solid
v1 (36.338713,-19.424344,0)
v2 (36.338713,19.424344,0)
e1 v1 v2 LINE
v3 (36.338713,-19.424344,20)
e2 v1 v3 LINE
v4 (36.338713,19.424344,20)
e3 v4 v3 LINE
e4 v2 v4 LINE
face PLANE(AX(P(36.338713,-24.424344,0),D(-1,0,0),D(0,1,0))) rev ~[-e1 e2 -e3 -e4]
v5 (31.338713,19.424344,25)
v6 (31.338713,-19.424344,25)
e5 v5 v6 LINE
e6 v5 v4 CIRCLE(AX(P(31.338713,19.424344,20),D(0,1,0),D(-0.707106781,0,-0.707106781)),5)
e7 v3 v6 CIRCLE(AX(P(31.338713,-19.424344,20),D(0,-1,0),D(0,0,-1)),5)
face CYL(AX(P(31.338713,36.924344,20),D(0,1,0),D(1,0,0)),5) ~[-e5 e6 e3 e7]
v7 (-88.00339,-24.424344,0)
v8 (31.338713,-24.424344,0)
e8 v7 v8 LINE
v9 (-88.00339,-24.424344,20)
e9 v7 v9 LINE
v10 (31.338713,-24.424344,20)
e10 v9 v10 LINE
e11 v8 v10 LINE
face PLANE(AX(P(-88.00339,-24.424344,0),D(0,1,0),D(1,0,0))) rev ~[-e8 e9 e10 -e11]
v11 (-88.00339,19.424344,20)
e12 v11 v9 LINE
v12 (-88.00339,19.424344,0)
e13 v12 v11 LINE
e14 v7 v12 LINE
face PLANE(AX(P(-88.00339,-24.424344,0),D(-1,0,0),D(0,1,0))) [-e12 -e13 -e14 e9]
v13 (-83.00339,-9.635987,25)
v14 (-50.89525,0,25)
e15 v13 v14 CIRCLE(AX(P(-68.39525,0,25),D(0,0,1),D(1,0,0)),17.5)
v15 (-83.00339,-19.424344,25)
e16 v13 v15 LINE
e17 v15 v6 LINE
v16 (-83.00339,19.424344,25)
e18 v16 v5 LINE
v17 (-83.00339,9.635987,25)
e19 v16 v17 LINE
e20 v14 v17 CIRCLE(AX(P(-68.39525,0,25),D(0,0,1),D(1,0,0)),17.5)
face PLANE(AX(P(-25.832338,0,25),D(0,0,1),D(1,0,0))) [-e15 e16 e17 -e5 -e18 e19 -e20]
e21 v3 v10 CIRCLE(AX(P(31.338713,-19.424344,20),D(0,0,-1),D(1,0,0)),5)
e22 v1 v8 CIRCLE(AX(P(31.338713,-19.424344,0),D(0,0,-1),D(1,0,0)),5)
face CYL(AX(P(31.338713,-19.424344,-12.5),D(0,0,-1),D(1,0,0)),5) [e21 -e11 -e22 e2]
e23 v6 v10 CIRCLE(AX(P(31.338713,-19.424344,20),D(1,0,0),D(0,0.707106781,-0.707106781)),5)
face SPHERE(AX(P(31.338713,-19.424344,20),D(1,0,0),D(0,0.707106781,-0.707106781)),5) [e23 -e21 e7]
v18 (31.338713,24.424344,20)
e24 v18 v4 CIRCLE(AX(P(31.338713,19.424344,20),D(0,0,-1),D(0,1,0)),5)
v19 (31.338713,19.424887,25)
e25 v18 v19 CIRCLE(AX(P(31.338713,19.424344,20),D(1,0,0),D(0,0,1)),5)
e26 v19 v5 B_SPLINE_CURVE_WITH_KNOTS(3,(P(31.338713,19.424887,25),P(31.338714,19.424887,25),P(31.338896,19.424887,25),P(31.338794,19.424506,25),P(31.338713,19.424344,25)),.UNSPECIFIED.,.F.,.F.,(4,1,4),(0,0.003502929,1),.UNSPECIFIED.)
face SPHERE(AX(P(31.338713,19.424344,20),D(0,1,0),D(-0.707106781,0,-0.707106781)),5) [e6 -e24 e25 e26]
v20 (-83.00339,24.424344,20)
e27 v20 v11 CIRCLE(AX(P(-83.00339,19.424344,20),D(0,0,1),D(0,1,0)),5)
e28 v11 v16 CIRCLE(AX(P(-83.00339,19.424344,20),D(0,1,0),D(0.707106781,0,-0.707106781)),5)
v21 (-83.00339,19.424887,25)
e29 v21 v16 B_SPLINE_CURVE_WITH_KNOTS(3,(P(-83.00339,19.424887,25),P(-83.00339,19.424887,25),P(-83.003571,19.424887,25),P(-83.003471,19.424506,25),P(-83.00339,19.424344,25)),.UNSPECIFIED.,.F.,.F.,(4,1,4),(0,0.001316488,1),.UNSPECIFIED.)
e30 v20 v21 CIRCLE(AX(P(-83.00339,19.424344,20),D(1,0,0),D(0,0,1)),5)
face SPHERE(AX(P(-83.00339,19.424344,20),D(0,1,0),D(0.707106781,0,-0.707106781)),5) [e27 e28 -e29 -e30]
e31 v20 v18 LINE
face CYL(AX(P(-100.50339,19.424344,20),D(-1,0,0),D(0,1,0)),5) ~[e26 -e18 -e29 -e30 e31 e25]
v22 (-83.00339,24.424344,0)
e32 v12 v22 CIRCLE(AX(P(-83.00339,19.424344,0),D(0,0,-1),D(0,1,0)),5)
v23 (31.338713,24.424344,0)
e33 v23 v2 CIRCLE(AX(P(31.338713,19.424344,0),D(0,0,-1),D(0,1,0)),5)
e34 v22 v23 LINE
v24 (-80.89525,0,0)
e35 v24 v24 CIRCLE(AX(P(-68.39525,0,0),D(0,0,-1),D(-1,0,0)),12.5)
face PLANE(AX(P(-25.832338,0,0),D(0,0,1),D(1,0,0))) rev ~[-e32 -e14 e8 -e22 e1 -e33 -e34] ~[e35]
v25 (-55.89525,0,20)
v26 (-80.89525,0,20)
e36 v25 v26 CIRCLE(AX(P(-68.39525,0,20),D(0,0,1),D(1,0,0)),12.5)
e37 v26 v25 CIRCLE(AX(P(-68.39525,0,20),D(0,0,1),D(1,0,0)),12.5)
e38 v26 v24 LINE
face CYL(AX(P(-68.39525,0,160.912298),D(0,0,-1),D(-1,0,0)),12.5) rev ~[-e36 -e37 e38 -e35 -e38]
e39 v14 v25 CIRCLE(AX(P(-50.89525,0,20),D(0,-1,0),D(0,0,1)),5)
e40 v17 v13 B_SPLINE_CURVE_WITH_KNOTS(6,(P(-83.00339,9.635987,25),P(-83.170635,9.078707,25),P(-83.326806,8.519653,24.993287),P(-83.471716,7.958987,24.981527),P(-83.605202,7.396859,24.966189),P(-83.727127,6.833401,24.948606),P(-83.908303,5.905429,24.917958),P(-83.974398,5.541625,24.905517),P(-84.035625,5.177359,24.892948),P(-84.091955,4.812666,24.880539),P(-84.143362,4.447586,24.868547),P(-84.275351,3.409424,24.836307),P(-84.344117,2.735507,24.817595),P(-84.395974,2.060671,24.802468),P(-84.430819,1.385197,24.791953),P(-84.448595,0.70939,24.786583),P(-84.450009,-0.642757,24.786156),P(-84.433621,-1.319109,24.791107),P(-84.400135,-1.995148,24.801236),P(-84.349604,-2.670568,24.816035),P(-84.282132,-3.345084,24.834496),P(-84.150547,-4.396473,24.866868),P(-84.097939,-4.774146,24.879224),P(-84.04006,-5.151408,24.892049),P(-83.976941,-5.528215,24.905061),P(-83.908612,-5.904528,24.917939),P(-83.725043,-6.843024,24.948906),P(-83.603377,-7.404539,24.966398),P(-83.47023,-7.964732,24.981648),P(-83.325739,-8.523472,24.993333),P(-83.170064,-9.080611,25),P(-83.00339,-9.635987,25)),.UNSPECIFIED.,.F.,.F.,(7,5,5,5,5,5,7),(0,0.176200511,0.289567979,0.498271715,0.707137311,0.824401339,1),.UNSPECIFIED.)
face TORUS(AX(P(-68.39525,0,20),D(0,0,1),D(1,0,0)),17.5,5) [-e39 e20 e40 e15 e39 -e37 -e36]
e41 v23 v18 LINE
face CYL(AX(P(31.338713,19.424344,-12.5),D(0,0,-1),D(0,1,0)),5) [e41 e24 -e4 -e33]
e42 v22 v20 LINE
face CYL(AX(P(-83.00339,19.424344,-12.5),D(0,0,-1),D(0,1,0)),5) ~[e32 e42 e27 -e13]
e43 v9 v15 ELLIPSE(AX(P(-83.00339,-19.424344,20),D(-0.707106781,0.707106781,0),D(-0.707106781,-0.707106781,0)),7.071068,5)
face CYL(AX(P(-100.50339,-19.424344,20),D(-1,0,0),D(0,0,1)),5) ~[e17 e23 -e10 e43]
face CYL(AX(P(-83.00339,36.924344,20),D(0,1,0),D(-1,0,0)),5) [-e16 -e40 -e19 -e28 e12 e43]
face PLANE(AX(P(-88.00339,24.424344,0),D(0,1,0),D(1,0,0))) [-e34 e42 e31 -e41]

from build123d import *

# Parameters (mm, degrees)
F0_W         = 124.3421025574
F0_H         = 48.8486886024
F1_DEPTH     = 25
F3_D         = 25
F4_T1_DEPTH  = 149.3421025574
F4_T3_DEPTH  = 73.8486886024
F5_T1_DEPTH  = 32.5
F5_S5_W      = 5
F5_S5_H      = 5
F5_T6_DEPTH  = 5
F6_T1_DEPTH  = 32.5
F6_S5_W      = 5
F6_S5_H      = 5
F6_T6_DEPTH  = 5
F6_S11_W     = 5
F6_S11_H     = 5
F6_T12_DEPTH = 5


# Not quite as in the source:
# - a fillet or chamfer that OpenCascade refuses, or shapes differently, is made with other operations: its cross-section is extruded or revolved along the edge and cut away or added


with BuildPart() as f1:
    # F0 (on Top) → F1 (new body)
    with BuildSketch(Plane.XY):
        with Locations((-25.8323382586, 0)):
            Rectangle(F0_W, F0_H)
    extrude(amount=F1_DEPTH)

    # F3 (through all)
    with Locations(Plane.XY.offset(25)):
        with Locations((-68.3952495456, 0)):
            Hole(F3_D / 2)

    # F4: fillet of radius 5 on 5 edges, made by hand

    # F4_s2 → F4_t1 (cut)
    with BuildSketch(Plane.YZ.offset(-100.5033895373)):
        with BuildLine():
            ThreePointArc((24.4243443012, 20), (22.9598782072, 23.5355339059), (19.4243443012, 25))
            Line((19.4243443012, 25), (24.4243443012, 25))
            Line((24.4243443012, 25), (24.4243443012, 20))
        make_face()
        with BuildLine():
            ThreePointArc((-19.4243443012, 25), (-22.9598782072, 23.5355339059), (-24.4243443012, 20))
            Line((-24.4243443012, 20), (-24.4243443012, 25))
            Line((-24.4243443012, 25), (-19.4243443012, 25))
        make_face()
    extrude(amount=F4_T1_DEPTH, mode=Mode.SUBTRACT)

    # F4_s4 → F4_t3 (cut)
    with BuildSketch(Plane.XZ.offset(-36.9243443012)):
        with BuildLine():
            ThreePointArc((36.3387130201, 20), (34.874246926, 23.5355339059), (31.3387130201, 25))
            Line((31.3387130201, 25), (36.3387130201, 25))
            Line((36.3387130201, 25), (36.3387130201, 20))
        make_face()
        with BuildLine():
            ThreePointArc((-88.0033895373, 20), (-86.5389234433, 23.5355339059), (-83.0033895373, 25))
            Line((-83.0033895373, 25), (-88.0033895373, 25))
            Line((-88.0033895373, 25), (-88.0033895373, 20))
        make_face()
    extrude(amount=F4_T3_DEPTH, mode=Mode.SUBTRACT)

    # F4_s5 → F4_t6 (revolve, cut)
    with BuildSketch(Plane.XZ):
        with BuildLine():
            ThreePointArc((-50.8952495456, 25), (-54.4307834515, 23.5355339059), (-55.8952495456, 20))
            Line((-55.8952495456, 20), (-55.8952495456, 25))
            Line((-55.8952495456, 25), (-50.8952495456, 25))
        make_face()
    revolve(axis=Axis((-68.3952495456, 0, 25), (0, 0, 1)), mode=Mode.SUBTRACT)

    # F5: fillet of radius 5 on 1 edges, made by hand

    # F5_s2 → F5_t1 (cut)
    with BuildSketch(Plane.XY.offset(-12.5)):
        with BuildLine():
            ThreePointArc((36.3387130201, -19.4243443012), (34.874246926, -22.9598782072), (31.3387130201, -24.4243443012))
            Line((31.3387130201, -24.4243443012), (36.3387130201, -24.4243443012))
            Line((36.3387130201, -24.4243443012), (36.3387130201, -19.4243443012))
        make_face()
    extrude(amount=F5_T1_DEPTH, mode=Mode.SUBTRACT)


with BuildPart() as f5_tool4:
    # F5_s5 → F5_t6 (new body)
    with BuildSketch(Plane.YZ.offset(31.3387130201)):
        with Locations((-21.9243443012, 22.5)):
            Rectangle(F5_S5_W, F5_S5_H)
    extrude(amount=F5_T6_DEPTH)

    # F5_s7 → F5_t8 (revolve, cut)
    with BuildSketch(Plane(origin=(31.3387130201, -19.4243443012, 20), x_dir=(0, 0.7071067812, -0.7071067812), z_dir=(0, -0.7071067812, -0.7071067812))):
        with BuildLine():
            ThreePointArc((0, -5), (5, 0), (0, 5))
            Line((0, 5), (0, -5))
        make_face()
    revolve(axis=Axis((31.3387130201, -19.4243443012, 20), (1, 0, 0)), mode=Mode.SUBTRACT)


with BuildPart() as f1_1:
    add(f1.part)

    # F5_t3: cut F5_tool4
    add(f5_tool4.part, mode=Mode.SUBTRACT)

    # F6: fillet of radius 5 on 2 edges, made by hand

    # F6_s2 → F6_t1 (cut)
    with BuildSketch(Plane.XY.offset(-12.5)):
        with BuildLine():
            ThreePointArc((-83.0033895373, 24.4243443012), (-86.5389234433, 22.9598782072), (-88.0033895373, 19.4243443012))
            Line((-88.0033895373, 19.4243443012), (-88.0033895373, 24.4243443012))
            Line((-88.0033895373, 24.4243443012), (-83.0033895373, 24.4243443012))
        make_face()
        with BuildLine():
            ThreePointArc((31.3387130201, 24.4243443012), (34.874246926, 22.9598782072), (36.3387130201, 19.4243443012))
            Line((36.3387130201, 19.4243443012), (36.3387130201, 24.4243443012))
            Line((36.3387130201, 24.4243443012), (31.3387130201, 24.4243443012))
        make_face()
    extrude(amount=F6_T1_DEPTH, mode=Mode.SUBTRACT)


with BuildPart() as f6_tool4:
    # F6_s5 → F6_t6 (new body)
    with BuildSketch(Plane.XZ.offset(-19.4243443012)):
        with Locations((33.8387130201, 22.5)):
            Rectangle(F6_S5_W, F6_S5_H)
    extrude(amount=-F6_T6_DEPTH)

    # F6_s7 → F6_t8 (revolve, cut)
    with BuildSketch(Plane(origin=(31.3387130201, 19.4243443012, 20), x_dir=(-0.7071067812, 0, -0.7071067812), z_dir=(0.7071067812, 0, -0.7071067812))):
        with BuildLine():
            ThreePointArc((0, -5), (5, 0), (0, 5))
            Line((0, 5), (0, -5))
        make_face()
    revolve(axis=Axis((31.3387130201, 19.4243443012, 20), (0, 1, 0)), mode=Mode.SUBTRACT)


with BuildPart() as f1_2:
    add(f1_1.part)

    # F6_t3: cut F6_tool4
    add(f6_tool4.part, mode=Mode.SUBTRACT)


with BuildPart() as f6_tool10:
    # F6_s11 → F6_t12 (new body)
    with BuildSketch(Plane.XZ.offset(-19.4243443012)):
        with Locations((-85.5033895373, 22.5)):
            Rectangle(F6_S11_W, F6_S11_H)
    extrude(amount=-F6_T12_DEPTH)

    # F6_s13 → F6_t14 (revolve, cut)
    with BuildSketch(Plane(origin=(-83.0033895373, 19.4243443012, 20), x_dir=(0.7071067812, 0, -0.7071067812), z_dir=(0.7071067812, 0, 0.7071067812))):
        with BuildLine():
            ThreePointArc((0, -5), (5, 0), (0, 5))
            Line((0, 5), (0, -5))
        make_face()
    revolve(axis=Axis((-83.0033895373, 19.4243443012, 20), (0, 1, 0)), mode=Mode.SUBTRACT)


with BuildPart() as f1_3:
    add(f1_2.part)

    # F6_t9: cut F6_tool10
    add(f6_tool10.part, mode=Mode.SUBTRACT)


solid = f1_3.part
